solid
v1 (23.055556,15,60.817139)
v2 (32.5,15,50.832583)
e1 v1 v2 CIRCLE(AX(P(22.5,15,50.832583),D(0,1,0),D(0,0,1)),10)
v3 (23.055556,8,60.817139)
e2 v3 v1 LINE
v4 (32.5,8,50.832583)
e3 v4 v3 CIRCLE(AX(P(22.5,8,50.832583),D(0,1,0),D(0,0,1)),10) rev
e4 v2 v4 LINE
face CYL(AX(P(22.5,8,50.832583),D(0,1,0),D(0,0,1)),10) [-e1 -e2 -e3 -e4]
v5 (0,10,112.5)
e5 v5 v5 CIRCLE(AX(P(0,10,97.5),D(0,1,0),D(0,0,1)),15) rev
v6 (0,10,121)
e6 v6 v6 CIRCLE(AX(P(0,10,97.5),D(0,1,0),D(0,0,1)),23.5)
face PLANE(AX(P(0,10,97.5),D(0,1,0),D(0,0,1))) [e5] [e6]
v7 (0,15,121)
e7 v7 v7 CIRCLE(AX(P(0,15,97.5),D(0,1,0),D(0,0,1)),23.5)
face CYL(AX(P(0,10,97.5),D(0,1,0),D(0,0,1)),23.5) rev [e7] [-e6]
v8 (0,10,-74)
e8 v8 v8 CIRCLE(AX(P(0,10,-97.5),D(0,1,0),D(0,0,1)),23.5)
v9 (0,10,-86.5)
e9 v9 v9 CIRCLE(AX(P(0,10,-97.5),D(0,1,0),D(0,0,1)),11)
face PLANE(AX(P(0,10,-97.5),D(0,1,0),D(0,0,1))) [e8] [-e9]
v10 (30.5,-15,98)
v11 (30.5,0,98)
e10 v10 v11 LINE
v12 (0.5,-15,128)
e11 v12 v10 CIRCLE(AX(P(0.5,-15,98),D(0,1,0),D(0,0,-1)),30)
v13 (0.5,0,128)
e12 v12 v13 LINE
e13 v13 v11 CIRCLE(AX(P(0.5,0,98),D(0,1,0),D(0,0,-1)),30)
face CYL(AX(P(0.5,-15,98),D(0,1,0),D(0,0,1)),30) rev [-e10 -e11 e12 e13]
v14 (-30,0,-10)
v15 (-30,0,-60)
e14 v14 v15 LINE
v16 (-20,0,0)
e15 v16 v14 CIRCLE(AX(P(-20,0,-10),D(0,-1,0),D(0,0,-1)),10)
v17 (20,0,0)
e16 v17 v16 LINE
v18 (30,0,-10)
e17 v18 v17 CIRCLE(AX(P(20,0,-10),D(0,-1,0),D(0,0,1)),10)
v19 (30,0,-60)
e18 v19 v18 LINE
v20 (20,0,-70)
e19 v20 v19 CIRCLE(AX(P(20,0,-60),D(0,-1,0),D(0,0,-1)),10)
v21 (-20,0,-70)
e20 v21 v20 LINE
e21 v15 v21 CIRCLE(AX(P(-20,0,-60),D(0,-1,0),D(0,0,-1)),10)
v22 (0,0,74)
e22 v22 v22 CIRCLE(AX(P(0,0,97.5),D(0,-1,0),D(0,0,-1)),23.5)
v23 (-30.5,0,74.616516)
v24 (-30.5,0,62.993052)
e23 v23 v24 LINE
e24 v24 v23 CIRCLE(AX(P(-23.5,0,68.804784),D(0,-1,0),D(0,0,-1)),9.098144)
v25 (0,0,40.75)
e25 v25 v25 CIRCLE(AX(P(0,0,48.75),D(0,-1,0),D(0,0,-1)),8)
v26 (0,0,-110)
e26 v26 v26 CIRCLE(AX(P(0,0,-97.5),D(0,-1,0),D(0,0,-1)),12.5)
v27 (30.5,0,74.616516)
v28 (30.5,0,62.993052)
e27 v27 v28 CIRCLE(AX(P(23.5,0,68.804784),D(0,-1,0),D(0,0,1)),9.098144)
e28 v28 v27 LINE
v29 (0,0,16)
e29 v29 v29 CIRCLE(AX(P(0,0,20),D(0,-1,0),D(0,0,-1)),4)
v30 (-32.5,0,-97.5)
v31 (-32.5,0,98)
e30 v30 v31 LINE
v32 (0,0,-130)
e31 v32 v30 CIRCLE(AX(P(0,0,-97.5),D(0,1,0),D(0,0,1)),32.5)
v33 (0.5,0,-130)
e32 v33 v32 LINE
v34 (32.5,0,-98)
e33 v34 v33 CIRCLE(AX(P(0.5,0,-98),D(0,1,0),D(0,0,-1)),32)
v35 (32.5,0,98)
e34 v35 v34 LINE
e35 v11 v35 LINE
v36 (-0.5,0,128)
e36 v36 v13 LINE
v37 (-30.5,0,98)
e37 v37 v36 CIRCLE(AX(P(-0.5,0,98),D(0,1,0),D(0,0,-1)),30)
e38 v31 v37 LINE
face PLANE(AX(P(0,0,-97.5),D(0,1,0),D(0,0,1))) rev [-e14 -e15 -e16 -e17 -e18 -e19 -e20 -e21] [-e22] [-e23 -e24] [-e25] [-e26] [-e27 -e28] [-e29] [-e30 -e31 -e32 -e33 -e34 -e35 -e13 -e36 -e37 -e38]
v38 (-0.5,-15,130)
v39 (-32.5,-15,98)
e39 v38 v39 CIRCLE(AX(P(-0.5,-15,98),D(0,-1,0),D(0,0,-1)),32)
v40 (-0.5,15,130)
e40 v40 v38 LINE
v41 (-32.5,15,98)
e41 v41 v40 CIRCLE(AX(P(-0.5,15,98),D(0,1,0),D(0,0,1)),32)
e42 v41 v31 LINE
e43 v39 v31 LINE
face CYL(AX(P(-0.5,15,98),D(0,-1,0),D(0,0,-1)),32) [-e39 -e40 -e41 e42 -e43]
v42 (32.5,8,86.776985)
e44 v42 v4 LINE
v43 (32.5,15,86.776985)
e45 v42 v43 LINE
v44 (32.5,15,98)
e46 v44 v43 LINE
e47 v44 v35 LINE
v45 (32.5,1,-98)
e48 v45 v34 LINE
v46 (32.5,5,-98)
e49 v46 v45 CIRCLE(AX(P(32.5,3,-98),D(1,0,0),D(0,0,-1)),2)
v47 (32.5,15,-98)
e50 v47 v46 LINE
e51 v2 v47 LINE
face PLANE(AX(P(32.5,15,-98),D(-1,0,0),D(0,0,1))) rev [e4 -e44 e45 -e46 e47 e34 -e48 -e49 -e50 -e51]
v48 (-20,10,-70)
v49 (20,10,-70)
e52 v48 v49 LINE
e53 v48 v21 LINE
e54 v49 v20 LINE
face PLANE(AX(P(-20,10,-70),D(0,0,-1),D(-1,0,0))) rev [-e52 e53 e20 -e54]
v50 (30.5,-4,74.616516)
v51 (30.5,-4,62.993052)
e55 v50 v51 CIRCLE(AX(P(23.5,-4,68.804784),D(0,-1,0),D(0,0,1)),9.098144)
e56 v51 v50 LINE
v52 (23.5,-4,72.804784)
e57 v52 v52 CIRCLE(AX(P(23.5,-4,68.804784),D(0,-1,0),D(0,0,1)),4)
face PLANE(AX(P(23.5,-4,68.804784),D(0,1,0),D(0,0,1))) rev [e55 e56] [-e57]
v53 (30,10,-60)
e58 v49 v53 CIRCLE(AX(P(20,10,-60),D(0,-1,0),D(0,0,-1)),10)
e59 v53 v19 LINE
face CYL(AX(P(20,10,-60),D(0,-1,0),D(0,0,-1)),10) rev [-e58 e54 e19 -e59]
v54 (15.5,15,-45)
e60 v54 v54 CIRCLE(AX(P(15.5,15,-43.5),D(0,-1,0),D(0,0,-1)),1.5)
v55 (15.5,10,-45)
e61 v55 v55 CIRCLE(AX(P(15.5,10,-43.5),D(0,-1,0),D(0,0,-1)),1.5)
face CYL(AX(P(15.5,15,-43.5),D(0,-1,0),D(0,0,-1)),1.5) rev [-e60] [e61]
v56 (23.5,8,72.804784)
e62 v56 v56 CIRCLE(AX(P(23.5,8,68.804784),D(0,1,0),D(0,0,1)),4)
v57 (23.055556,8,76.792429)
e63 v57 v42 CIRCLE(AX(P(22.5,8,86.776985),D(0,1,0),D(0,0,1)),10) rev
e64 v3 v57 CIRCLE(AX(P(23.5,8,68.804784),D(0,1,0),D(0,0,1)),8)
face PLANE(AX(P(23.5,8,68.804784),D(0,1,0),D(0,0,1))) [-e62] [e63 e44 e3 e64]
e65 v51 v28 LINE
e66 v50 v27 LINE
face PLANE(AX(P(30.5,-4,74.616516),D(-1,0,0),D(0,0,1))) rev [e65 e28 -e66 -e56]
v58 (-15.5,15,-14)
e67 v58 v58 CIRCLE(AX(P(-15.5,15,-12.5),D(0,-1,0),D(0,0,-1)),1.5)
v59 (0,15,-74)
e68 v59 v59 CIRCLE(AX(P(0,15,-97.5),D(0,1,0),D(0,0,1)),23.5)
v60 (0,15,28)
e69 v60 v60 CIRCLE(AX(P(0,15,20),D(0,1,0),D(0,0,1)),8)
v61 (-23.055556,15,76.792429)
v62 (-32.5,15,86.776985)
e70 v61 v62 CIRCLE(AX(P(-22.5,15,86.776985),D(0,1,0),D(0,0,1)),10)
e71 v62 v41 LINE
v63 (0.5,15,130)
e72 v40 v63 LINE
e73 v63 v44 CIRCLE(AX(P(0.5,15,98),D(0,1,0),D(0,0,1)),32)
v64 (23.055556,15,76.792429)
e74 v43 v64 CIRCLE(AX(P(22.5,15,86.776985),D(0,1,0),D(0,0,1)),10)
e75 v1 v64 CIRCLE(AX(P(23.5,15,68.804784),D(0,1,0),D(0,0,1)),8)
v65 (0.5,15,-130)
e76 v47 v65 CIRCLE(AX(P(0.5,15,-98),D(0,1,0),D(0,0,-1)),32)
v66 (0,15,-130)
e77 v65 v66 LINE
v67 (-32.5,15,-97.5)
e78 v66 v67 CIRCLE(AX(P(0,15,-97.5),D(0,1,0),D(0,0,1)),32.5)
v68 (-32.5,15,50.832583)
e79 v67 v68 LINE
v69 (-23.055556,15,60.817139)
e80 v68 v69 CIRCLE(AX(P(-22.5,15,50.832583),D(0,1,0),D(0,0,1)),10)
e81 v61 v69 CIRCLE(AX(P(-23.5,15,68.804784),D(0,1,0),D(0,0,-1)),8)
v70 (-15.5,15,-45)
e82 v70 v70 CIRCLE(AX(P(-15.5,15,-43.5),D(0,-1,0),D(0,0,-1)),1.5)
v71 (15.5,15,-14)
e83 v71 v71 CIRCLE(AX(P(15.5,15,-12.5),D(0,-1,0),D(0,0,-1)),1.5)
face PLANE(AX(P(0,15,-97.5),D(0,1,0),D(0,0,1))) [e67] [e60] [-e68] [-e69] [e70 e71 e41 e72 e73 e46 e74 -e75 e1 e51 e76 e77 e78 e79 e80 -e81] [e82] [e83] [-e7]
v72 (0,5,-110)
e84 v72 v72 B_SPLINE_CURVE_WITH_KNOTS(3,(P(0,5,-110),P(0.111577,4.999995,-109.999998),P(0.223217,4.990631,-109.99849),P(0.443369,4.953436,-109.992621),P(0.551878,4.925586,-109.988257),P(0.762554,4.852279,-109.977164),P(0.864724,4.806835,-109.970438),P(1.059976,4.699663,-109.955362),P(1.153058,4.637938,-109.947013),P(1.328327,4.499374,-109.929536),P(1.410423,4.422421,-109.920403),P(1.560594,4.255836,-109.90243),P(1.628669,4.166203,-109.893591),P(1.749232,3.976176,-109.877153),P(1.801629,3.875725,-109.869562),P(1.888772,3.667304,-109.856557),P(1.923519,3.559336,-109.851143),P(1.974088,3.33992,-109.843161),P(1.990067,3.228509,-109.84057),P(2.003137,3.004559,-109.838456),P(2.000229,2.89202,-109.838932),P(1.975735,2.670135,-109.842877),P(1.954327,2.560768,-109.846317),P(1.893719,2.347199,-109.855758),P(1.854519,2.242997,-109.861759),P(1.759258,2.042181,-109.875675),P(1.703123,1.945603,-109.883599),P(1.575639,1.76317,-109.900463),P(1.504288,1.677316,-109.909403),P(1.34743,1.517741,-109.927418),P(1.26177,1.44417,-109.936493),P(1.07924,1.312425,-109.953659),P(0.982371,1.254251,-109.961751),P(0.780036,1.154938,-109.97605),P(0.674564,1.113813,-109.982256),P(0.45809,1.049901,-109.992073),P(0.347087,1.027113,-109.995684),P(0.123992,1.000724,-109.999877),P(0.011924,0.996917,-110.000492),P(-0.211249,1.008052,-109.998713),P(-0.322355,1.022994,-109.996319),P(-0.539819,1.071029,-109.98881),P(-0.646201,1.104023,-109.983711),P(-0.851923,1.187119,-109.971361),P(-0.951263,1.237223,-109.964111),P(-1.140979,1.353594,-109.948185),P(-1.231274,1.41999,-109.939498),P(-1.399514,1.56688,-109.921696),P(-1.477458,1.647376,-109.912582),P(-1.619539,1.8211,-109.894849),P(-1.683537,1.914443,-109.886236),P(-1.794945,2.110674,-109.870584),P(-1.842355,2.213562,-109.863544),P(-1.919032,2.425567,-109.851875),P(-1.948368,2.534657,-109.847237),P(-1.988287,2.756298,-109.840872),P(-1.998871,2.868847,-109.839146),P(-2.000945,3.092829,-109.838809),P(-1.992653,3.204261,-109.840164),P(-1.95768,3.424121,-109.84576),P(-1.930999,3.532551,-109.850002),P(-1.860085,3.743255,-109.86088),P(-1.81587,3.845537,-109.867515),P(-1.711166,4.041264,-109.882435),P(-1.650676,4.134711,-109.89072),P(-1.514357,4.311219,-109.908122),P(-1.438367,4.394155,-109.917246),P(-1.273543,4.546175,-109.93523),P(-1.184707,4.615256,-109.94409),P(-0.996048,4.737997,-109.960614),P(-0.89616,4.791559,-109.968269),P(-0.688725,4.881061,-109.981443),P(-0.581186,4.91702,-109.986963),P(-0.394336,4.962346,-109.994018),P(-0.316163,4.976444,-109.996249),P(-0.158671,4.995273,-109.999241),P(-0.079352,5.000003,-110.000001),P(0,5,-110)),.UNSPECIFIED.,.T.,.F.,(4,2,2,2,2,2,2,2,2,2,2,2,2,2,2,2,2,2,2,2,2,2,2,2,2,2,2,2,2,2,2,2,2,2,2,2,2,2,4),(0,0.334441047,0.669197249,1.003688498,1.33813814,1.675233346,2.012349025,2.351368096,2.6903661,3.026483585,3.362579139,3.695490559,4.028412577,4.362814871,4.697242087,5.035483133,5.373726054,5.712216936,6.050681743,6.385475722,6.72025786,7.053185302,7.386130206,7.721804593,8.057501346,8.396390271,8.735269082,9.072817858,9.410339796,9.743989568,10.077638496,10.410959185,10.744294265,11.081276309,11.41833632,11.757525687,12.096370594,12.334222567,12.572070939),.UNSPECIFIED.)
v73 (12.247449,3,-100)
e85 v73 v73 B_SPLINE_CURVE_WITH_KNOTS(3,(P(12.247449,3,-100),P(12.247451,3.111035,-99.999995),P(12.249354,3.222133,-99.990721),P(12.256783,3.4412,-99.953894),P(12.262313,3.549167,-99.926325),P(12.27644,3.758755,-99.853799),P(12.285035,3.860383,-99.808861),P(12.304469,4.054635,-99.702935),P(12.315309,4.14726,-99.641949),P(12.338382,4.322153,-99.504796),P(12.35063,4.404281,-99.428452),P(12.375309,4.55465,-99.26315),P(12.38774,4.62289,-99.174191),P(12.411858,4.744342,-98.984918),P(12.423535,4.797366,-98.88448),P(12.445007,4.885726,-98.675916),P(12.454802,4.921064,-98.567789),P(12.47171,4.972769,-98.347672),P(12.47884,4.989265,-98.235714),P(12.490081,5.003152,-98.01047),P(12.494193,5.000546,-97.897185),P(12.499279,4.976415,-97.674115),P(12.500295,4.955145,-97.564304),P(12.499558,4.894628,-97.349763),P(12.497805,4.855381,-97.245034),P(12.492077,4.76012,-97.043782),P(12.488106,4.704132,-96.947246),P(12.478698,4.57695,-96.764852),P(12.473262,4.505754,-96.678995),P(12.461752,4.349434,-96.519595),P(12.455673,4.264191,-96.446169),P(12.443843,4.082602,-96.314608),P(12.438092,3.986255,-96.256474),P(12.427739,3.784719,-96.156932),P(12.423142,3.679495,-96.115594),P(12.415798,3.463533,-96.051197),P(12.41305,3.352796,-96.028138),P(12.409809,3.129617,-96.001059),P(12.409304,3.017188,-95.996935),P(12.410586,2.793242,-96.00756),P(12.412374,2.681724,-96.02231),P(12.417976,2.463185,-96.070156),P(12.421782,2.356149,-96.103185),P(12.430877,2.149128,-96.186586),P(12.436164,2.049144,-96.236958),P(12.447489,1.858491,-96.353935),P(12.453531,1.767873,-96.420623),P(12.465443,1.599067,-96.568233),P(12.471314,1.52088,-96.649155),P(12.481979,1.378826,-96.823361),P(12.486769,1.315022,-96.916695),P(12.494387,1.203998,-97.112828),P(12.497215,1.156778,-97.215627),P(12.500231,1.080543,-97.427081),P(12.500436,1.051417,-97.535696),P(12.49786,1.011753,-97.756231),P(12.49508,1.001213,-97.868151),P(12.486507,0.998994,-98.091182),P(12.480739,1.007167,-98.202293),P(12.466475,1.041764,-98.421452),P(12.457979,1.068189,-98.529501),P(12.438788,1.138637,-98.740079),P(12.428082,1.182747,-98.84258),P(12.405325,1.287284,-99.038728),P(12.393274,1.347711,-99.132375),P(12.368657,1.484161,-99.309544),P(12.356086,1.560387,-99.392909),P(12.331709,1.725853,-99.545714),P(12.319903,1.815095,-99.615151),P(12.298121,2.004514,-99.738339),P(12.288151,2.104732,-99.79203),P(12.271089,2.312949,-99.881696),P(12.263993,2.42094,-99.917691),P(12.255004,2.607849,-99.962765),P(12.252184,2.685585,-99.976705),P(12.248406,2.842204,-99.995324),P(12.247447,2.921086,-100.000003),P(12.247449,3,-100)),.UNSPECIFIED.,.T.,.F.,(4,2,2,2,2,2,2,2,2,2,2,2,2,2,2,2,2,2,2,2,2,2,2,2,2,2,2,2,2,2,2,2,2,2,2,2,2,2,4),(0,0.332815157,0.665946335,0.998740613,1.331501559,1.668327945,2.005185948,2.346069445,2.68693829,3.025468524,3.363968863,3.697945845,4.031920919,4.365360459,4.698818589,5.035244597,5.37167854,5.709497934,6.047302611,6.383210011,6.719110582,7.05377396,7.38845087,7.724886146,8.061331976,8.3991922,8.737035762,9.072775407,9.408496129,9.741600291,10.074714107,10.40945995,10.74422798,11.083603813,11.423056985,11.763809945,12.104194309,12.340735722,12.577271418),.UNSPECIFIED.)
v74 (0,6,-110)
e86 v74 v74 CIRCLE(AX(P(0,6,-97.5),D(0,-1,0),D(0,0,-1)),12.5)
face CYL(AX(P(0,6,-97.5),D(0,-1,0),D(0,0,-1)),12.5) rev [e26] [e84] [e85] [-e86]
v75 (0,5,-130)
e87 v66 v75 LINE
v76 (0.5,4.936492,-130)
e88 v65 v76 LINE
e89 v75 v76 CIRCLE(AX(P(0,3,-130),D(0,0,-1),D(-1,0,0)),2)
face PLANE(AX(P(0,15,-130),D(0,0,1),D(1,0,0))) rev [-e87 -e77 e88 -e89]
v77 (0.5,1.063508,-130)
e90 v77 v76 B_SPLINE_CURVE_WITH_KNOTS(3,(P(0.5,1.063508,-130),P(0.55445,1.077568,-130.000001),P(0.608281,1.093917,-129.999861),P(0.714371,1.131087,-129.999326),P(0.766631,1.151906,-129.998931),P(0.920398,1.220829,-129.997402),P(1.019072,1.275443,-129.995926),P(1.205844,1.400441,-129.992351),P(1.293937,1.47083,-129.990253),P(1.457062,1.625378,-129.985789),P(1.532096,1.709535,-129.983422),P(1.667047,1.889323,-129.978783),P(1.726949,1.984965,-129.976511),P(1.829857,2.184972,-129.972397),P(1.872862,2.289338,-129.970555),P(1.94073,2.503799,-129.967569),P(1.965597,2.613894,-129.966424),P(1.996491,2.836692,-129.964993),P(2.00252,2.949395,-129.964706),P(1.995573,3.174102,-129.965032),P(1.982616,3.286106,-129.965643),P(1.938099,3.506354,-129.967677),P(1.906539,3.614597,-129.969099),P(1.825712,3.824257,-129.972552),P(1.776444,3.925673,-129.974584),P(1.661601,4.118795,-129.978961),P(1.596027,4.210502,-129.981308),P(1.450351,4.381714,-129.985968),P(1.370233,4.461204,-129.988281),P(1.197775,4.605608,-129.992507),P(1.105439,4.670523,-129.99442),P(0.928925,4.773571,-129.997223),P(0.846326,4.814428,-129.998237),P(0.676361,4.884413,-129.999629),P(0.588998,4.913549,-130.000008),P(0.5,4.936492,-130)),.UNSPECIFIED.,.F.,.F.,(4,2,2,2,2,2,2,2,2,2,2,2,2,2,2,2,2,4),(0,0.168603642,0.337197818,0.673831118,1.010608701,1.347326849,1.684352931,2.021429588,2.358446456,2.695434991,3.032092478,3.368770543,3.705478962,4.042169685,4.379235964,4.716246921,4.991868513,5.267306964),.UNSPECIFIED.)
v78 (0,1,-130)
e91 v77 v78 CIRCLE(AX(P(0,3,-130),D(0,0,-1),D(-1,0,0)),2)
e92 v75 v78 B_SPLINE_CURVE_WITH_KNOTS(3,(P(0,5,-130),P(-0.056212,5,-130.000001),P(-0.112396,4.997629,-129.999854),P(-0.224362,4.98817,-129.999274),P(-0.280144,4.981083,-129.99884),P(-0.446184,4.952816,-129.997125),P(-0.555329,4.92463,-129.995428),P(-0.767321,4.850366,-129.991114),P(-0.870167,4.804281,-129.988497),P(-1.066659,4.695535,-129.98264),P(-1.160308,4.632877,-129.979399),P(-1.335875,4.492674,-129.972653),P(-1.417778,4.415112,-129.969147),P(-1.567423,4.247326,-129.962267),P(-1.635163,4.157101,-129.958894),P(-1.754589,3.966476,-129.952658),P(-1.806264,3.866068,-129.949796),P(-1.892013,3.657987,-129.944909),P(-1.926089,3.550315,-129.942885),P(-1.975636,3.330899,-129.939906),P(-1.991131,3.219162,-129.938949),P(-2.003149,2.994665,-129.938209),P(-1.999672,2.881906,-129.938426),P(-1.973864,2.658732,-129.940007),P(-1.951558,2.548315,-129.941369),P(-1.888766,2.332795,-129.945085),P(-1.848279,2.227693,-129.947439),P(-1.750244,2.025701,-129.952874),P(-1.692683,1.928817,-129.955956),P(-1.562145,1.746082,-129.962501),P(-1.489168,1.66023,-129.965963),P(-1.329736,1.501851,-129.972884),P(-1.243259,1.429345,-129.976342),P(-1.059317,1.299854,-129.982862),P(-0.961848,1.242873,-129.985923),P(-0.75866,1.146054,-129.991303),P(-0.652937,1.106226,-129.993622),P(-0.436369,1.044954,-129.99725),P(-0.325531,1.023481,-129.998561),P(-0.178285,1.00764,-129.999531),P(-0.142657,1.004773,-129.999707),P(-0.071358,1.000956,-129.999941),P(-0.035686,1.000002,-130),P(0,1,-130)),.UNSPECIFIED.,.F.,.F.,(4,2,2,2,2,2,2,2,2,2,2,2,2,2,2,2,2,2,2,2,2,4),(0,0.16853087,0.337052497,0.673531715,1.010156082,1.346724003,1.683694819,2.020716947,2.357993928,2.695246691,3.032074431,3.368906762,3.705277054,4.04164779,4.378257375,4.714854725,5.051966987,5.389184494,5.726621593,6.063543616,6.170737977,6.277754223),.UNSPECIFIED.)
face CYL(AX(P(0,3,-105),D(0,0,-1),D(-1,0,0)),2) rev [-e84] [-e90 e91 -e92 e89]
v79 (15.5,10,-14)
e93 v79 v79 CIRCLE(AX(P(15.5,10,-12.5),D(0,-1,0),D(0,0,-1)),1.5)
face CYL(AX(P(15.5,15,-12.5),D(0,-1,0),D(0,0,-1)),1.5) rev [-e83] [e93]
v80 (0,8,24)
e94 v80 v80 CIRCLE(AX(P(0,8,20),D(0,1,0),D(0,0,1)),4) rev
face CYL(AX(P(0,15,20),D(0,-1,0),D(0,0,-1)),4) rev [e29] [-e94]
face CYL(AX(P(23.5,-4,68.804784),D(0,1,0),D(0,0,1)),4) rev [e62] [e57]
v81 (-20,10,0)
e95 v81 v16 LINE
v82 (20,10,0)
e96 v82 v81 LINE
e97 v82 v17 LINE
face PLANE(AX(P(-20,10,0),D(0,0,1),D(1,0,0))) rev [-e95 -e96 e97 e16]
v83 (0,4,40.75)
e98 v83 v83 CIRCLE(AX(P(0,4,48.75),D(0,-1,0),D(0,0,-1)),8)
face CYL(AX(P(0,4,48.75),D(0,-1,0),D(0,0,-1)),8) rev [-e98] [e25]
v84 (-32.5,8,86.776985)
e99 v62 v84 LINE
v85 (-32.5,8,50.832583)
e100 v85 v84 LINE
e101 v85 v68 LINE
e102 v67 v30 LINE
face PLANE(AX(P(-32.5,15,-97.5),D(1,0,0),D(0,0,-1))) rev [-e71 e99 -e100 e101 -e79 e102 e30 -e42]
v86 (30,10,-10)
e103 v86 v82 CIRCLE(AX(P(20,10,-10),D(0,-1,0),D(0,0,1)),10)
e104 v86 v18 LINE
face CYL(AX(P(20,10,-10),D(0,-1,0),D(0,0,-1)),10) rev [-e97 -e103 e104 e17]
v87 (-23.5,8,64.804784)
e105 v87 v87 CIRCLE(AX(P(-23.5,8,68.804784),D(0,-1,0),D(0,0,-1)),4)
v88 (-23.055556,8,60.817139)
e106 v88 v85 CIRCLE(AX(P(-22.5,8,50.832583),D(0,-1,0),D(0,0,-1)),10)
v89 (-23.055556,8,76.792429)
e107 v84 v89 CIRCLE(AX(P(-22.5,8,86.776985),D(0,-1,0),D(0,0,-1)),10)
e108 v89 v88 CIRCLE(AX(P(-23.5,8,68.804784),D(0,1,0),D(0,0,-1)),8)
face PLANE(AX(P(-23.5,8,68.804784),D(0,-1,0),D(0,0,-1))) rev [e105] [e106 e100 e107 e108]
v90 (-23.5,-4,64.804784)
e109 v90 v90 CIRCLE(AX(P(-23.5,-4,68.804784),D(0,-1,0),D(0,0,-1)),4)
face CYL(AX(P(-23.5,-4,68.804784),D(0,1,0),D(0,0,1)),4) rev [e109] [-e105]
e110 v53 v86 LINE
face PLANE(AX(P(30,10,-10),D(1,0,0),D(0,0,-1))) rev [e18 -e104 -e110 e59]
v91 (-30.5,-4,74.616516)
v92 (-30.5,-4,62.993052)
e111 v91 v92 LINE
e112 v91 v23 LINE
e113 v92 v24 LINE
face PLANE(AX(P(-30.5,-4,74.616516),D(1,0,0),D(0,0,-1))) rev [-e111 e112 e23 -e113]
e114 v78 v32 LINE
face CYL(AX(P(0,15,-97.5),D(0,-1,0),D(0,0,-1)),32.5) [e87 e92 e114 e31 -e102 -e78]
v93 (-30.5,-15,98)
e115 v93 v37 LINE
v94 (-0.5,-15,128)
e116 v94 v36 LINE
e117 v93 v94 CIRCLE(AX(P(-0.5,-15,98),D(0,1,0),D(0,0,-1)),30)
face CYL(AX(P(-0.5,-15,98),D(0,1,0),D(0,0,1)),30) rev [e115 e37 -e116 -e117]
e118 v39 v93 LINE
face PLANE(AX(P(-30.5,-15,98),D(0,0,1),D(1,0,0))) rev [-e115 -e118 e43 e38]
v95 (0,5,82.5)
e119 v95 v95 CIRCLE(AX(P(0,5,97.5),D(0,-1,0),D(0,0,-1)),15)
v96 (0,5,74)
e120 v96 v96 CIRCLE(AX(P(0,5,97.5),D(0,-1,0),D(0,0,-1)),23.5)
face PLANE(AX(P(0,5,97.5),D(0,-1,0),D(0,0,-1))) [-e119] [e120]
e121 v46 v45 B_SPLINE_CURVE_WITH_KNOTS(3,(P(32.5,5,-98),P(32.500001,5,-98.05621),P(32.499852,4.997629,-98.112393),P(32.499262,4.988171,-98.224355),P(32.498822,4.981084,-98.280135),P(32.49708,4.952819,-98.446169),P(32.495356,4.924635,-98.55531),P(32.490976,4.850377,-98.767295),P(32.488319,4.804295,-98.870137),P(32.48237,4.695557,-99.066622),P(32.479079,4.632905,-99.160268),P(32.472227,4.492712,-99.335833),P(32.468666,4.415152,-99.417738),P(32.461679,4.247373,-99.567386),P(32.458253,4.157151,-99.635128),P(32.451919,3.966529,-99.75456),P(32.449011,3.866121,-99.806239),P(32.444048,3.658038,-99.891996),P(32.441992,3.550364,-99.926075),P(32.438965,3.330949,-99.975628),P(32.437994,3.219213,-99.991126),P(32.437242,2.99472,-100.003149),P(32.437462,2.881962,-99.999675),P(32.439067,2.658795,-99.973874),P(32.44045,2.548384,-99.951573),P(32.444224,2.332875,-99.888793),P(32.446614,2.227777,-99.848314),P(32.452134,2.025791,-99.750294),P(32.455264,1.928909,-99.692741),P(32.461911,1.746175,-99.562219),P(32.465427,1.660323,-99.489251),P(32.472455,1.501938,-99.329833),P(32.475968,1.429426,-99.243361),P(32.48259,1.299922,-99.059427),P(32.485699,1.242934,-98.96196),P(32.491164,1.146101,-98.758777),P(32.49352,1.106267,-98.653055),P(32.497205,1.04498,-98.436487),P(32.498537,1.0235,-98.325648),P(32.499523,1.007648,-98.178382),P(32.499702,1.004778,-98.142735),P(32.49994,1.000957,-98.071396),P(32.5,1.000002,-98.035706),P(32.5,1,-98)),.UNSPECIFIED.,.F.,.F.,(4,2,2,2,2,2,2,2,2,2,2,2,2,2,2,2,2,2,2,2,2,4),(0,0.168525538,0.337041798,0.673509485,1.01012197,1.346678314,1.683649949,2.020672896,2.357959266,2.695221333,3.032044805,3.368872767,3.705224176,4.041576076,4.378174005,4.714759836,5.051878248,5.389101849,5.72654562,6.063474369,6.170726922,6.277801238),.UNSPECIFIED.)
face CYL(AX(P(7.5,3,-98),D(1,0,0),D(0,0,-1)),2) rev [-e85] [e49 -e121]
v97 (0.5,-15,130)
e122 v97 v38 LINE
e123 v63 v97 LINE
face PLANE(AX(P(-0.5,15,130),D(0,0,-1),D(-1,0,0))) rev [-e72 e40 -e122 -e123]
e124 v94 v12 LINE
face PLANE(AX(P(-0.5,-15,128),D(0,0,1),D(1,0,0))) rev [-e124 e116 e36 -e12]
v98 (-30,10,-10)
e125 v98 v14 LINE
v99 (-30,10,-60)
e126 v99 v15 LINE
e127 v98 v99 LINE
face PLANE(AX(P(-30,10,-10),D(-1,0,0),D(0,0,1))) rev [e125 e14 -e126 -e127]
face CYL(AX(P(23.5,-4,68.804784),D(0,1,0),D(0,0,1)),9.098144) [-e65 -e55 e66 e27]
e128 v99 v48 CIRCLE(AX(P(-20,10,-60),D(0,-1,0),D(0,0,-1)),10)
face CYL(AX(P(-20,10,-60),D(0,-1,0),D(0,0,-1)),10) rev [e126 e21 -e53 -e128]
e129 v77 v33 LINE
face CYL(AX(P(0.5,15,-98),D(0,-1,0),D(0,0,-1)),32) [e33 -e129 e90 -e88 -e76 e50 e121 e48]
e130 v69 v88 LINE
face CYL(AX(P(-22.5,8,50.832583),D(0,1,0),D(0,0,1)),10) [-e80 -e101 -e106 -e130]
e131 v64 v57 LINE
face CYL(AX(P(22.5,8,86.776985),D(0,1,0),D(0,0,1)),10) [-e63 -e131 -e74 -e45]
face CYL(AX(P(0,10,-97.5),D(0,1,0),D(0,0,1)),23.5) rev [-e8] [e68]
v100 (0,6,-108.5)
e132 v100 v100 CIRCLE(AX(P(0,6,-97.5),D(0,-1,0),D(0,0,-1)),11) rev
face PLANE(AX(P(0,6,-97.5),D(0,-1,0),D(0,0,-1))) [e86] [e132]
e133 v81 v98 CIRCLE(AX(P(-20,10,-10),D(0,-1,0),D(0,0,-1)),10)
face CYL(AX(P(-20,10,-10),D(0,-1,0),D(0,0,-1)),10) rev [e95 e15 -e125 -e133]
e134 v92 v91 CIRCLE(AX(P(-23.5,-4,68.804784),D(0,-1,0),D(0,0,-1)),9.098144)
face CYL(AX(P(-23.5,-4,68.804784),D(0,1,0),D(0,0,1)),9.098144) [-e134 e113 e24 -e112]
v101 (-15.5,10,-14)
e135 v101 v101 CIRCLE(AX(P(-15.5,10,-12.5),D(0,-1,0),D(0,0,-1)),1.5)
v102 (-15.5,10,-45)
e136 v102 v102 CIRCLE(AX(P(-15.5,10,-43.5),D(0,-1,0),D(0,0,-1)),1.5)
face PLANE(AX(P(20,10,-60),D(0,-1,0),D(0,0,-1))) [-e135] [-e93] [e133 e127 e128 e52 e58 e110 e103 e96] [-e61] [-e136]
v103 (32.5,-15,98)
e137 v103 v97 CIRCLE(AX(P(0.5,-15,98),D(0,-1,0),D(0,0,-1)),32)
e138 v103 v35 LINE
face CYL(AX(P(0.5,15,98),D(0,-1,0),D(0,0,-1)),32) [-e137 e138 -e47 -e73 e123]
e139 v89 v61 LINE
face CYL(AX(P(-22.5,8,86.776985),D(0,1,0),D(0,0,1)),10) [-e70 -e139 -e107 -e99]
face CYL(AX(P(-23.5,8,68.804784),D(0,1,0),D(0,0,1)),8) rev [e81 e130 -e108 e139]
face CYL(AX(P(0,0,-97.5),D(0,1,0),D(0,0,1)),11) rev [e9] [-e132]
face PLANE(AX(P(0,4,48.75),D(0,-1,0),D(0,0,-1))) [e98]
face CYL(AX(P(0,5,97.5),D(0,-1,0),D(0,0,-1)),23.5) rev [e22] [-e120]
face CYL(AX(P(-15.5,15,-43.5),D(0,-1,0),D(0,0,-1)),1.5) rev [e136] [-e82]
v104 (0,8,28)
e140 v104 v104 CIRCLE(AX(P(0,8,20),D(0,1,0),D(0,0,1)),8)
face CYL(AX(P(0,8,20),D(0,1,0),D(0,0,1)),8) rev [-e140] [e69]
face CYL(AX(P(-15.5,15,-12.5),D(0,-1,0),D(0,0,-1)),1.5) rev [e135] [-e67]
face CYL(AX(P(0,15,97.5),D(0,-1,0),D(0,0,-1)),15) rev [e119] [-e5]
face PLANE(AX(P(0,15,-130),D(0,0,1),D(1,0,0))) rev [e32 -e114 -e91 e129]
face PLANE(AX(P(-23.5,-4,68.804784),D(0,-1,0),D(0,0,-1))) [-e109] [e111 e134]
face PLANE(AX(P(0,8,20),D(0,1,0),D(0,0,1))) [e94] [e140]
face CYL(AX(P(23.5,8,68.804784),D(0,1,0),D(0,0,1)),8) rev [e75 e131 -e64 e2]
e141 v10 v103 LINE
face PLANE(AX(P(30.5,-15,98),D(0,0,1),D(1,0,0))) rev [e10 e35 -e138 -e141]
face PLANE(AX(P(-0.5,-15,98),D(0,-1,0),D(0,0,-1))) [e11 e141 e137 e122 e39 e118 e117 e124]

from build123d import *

# Parameters (mm, degrees)
BOSS_EXTRUDE1_DEPTH = 15
SKETCH2_R           = 23.5
CUT_EXTRUDE1_DEPTH  = 5
SKETCH3_R           = 11
CUT_EXTRUDE2_DEPTH  = 135.373546504
SKETCH17_R          = 23.5
CUT_EXTRUDE10_DEPTH = 5
SKETCH18_R          = 15
CUT_EXTRUDE11_DEPTH = 135.373546504
CUT_EXTRUDE12_START = -5
SKETCH19_R          = 23.5
CUT_EXTRUDE12_DEPTH = 5
CUT_EXTRUDE13_DEPTH = 10
SKETCH21_R          = 1.5
CUT_EXTRUDE14_DEPTH = 135.373546504
SKETCH22_R          = 8
CUT_EXTRUDE15_DEPTH = 4
SKETCH23_R          = 4
BOSS_EXTRUDE6_DEPTH = 4
SKETCH24_R          = 4
CUT_EXTRUDE16_DEPTH = 135.837865602
BOSS_EXTRUDE8_START = 15
BOSS_EXTRUDE8_DEPTH = 15
SKETCH28_R          = 8
CUT_EXTRUDE17_DEPTH = 7
FILLET1_R           = 10
SKETCH29_R          = 12.5
CUT_EXTRUDE18_DEPTH = 6
SKETCH30_R          = 2
CUT_EXTRUDE19_DEPTH = 25
SKETCH32_R          = 2
CUT_EXTRUDE20_DEPTH = 25


with BuildPart() as part:
    # Sketch1 → Boss-Extrude1 (new body)
    with BuildSketch(Plane(origin=(0, 0, 0), x_dir=(1, 0, 0), z_dir=(0, 1, 0))):
        with BuildLine():
            Line((0, 130), (0.5, 130))
            ThreePointArc((0.5, 130), (23.127416998, 120.627416998), (32.5, 98))
            Line((32.5, 98), (32.5, -98))
            ThreePointArc((32.5, -98), (23.127416998, -120.627416998), (0.5, -130))
            Line((0.5, -130), (-0.5, -130))
            ThreePointArc((-0.5, -130), (-23.127416998, -120.627416998), (-32.5, -98))
            Line((-32.5, -98), (-32.5, 97.5))
            ThreePointArc((-32.5, 97.5), (-22.980970389, 120.480970389), (0, 130))
        make_face()
    extrude(amount=BOSS_EXTRUDE1_DEPTH)

    # Sketch2 → Cut-Extrude1 (cut)
    with BuildSketch(Plane(origin=(0, 15, 0), x_dir=(1, 0, 0), z_dir=(0, 1, 0))):
        with Locations(Location((0, 97.5, 0), (0, 0, 270))):
            Circle(SKETCH2_R)
    extrude(amount=-CUT_EXTRUDE1_DEPTH, mode=Mode.SUBTRACT)

    # Sketch3 → Cut-Extrude2 (cut, through all)
    with BuildSketch(Plane(origin=(0, 10, 0), x_dir=(1, 0, 0), z_dir=(0, 1, 0))):
        with Locations(Location((0, 97.5, 0), (0, 0, 270))):
            Circle(SKETCH3_R)
    extrude(amount=-CUT_EXTRUDE2_DEPTH, mode=Mode.SUBTRACT)

    # Sketch17 → Cut-Extrude10 (cut)
    with BuildSketch(Plane.XZ):
        with Locations(Location((0, 97.5, 0), (0, 0, 270))):
            Circle(SKETCH17_R)
    extrude(amount=-CUT_EXTRUDE10_DEPTH, mode=Mode.SUBTRACT)

    # Sketch18 → Cut-Extrude11 (cut, through all)
    with BuildSketch(Plane.XZ.offset(-5)):
        with Locations(Location((0, 97.5, 0), (0, 0, 270))):
            Circle(SKETCH18_R)
    extrude(amount=-CUT_EXTRUDE11_DEPTH, mode=Mode.SUBTRACT)

    # Sketch19 → Cut-Extrude12 (cut)
    with BuildSketch(Plane(origin=(0, 15, 0), x_dir=(1, 0, 0), z_dir=(0, 1, 0)).offset(CUT_EXTRUDE12_START)):
        with Locations(Location((0, -97.5, 0), (0, 0, 90))):
            Circle(SKETCH19_R)
    extrude(amount=CUT_EXTRUDE12_DEPTH, mode=Mode.SUBTRACT)

    # Sketch20 → Cut-Extrude13 (cut)
    with BuildSketch(Plane.XZ):
        with BuildLine():
            Line((-20, 0), (20, 0))
            ThreePointArc((20, 0), (27.071067812, -2.928932188), (30, -10))
            Line((30, -10), (30, -60))
            ThreePointArc((30, -60), (27.071067812, -67.071067812), (20, -70))
            Line((20, -70), (-20, -70))
            ThreePointArc((-20, -70), (-27.071067812, -67.071067812), (-30, -60))
            Line((-30, -60), (-30, -10))
            ThreePointArc((-30, -10), (-27.071067812, -2.928932188), (-20, 0))
        make_face()
    extrude(amount=-CUT_EXTRUDE13_DEPTH, mode=Mode.SUBTRACT)

    # Sketch21 → Cut-Extrude14 (cut, through all)
    with BuildSketch(Plane.XZ.offset(-10)):
        with Locations(Location((-15.5, -12.5, 0), (0, 0, 270))):
            Circle(SKETCH21_R)
        with Locations(Location((15.5, -12.5, 0), (0, 0, 270))):
            Circle(SKETCH21_R)
        with Locations(Location((-15.5, -43.5, 0), (0, 0, 270))):
            Circle(SKETCH21_R)
        with Locations(Location((15.5, -43.5, 0), (0, 0, 270))):
            Circle(SKETCH21_R)
    extrude(amount=-CUT_EXTRUDE14_DEPTH, mode=Mode.SUBTRACT)

    # Sketch22 → Cut-Extrude15 (cut)
    with BuildSketch(Plane.XZ):
        with Locations(Location((0, 48.75, 0), (0, 0, 270))):
            Circle(SKETCH22_R)
    extrude(amount=-CUT_EXTRUDE15_DEPTH, mode=Mode.SUBTRACT)

    # Sketch23 → Boss-Extrude6 (add)
    # profile 1 of 2: a face of its own
    with BuildSketch(Plane.XZ):
        with BuildLine():
            Line((-30.5, 74.616516124), (-30.5, 62.993052049))
            ThreePointArc((-30.5, 62.993052049), (-14.401855723, 68.804784086), (-30.5, 74.616516124))
        make_face()
        with Locations(Location((-23.5, 68.804784086, 0), (0, 0, 270))):
            Circle(SKETCH23_R, mode=Mode.SUBTRACT)
    # profile 2 of 2: a face of its own
    with BuildSketch(Plane.XZ):
        with BuildLine():
            Line((30.5, 74.616516124), (30.5, 62.993052049))
            ThreePointArc((30.5, 62.993052049), (14.401855723, 68.804784086), (30.5, 74.616516124))
        make_face()
        with Locations(Location((23.5, 68.804784086, 0), (0, 0, 90))):
            Circle(SKETCH23_R, mode=Mode.SUBTRACT)
    extrude(amount=BOSS_EXTRUDE6_DEPTH)

    # Sketch24 → Cut-Extrude16 (cut, through all)
    with BuildSketch(Plane.XZ):
        with Locations(Location((0, 20, 0), (0, 0, 270))):
            Circle(SKETCH24_R)
        with Locations(Location((-23.5, 68.804784086, 0), (0, 0, 270))):
            Circle(SKETCH24_R)
        with Locations(Location((23.5, 68.804784086, 0), (0, 0, 90))):
            Circle(SKETCH24_R)
    extrude(amount=-CUT_EXTRUDE16_DEPTH, mode=Mode.SUBTRACT)

    # Sketch27 → Boss-Extrude8 (add)
    with BuildSketch(Plane.XZ.offset(BOSS_EXTRUDE8_START)):
        with BuildLine():
            Line((-0.5, 128), (0.5, 128))
            ThreePointArc((0.5, 128), (21.713203436, 119.213203436), (30.5, 98))
            Line((30.5, 98), (32.5, 98))
            ThreePointArc((32.5, 98), (23.127416998, 120.627416998), (0.5, 130))
            Line((0.5, 130), (-0.5, 130))
            ThreePointArc((-0.5, 130), (-23.127416998, 120.627416998), (-32.5, 98))
            Line((-32.5, 98), (-30.5, 98))
            ThreePointArc((-30.5, 98), (-21.713203436, 119.213203436), (-0.5, 128))
        make_face()
    extrude(amount=-BOSS_EXTRUDE8_DEPTH)

    # Sketch28 → Cut-Extrude17 (cut)
    with BuildSketch(Plane(origin=(0, 15, 0), x_dir=(1, 0, 0), z_dir=(0, 1, 0))):
        with Locations(Location((0, -20, 0), (0, 0, 270))):
            Circle(SKETCH28_R)
        with BuildLine():
            Line((-23.5, -60.804784086), (-32.5, -60.804784086))
            Line((-32.5, -60.804784086), (-32.5, -76.804784086))
            Line((-32.5, -76.804784086), (-23.5, -76.804784086))
            ThreePointArc((-23.5, -76.804784086), (-15.5, -68.804784086), (-23.5, -60.804784086))
        make_face()
        with BuildLine():
            Line((32.5, -60.804784086), (32.5, -76.804784086))
            Line((32.5, -76.804784086), (23.5, -76.804784086))
            ThreePointArc((23.5, -76.804784086), (15.5, -68.804784086), (23.5, -60.804784086))
            Line((23.5, -60.804784086), (32.5, -60.804784086))
        make_face()
    extrude(amount=-CUT_EXTRUDE17_DEPTH, mode=Mode.SUBTRACT)

    # Fillet1
    # the kernel refuses this fillet: 10 mm, written as the material it takes off along each edge
    with BuildSketch(Plane(origin=(32.5, 39.930501889, 76.804784086), x_dir=(0, 0, 1), z_dir=(0, -1, 0)), Plane(origin=(-32.5, 39.930501889, 60.804784086), x_dir=(0, 0, -1), z_dir=(0, -1, 0))) as fillet1_piece_1:
        with BuildLine():
            CenterArc((9.972200756, 10), FILLET1_R, 183.184738537, 86.815261463)
            Line((-0.01235522, 9.444444444), (-1.010810817, 9.388888889))
            ThreePointArc((-1.010810817, 9.388888889), (-1, 9), (-1, 0))
            Line((-1, 0), (0, -1))
            Line((0, -1), (9.972200756, -1))
            Line((9.972200756, -1), (9.972200756, 0))
        make_face()
    extrude(amount=31.930501889, mode=Mode.SUBTRACT)
    with BuildSketch(Plane(origin=(32.5, 39.930501889, 60.804784086), x_dir=(0, 0, -1), z_dir=(0, -1, 0)), Plane(origin=(-32.5, 39.930501889, 76.804784086), x_dir=(0, 0, 1), z_dir=(0, -1, 0))) as fillet1_piece_2:
        with BuildLine():
            CenterArc((9.972200756, -10), FILLET1_R, 90, 86.815261463)
            Line((-0.01235522, -9.444444444), (-1.010810817, -9.388888889))
            ThreePointArc((-1.010810817, -9.388888889), (-1, -9), (-1, 0))
            Line((-1, 0), (0, 1))
            Line((0, 1), (9.972200756, 1))
            Line((9.972200756, 1), (9.972200756, 0))
        make_face()
    extrude(amount=31.930501889, mode=Mode.SUBTRACT)

    # Sketch29 → Cut-Extrude18 (cut)
    with BuildSketch(Plane.XZ):
        with Locations(Location((0, -97.5, 0), (0, 0, 270))):
            Circle(SKETCH29_R)
    extrude(amount=-CUT_EXTRUDE18_DEPTH, mode=Mode.SUBTRACT)

    # Sketch30 → Cut-Extrude19 (cut)
    with BuildSketch(Plane(origin=(0, 0, -130), x_dir=(-1, 0, 0), z_dir=(0, 0, -1))):
        with Locations(Location((0, 3, 0), (0, 0, 270))):
            Circle(SKETCH30_R)
    extrude(amount=-CUT_EXTRUDE19_DEPTH, mode=Mode.SUBTRACT)

    # Sketch32 → Cut-Extrude20 (cut)
    with BuildSketch(Plane(origin=(32.5, 0, 0), x_dir=(0, 0, -1), z_dir=(1, 0, 0))):
        with Locations((98, 3)):
            Circle(SKETCH32_R)
    extrude(amount=-CUT_EXTRUDE20_DEPTH, mode=Mode.SUBTRACT)


solid = part.part
